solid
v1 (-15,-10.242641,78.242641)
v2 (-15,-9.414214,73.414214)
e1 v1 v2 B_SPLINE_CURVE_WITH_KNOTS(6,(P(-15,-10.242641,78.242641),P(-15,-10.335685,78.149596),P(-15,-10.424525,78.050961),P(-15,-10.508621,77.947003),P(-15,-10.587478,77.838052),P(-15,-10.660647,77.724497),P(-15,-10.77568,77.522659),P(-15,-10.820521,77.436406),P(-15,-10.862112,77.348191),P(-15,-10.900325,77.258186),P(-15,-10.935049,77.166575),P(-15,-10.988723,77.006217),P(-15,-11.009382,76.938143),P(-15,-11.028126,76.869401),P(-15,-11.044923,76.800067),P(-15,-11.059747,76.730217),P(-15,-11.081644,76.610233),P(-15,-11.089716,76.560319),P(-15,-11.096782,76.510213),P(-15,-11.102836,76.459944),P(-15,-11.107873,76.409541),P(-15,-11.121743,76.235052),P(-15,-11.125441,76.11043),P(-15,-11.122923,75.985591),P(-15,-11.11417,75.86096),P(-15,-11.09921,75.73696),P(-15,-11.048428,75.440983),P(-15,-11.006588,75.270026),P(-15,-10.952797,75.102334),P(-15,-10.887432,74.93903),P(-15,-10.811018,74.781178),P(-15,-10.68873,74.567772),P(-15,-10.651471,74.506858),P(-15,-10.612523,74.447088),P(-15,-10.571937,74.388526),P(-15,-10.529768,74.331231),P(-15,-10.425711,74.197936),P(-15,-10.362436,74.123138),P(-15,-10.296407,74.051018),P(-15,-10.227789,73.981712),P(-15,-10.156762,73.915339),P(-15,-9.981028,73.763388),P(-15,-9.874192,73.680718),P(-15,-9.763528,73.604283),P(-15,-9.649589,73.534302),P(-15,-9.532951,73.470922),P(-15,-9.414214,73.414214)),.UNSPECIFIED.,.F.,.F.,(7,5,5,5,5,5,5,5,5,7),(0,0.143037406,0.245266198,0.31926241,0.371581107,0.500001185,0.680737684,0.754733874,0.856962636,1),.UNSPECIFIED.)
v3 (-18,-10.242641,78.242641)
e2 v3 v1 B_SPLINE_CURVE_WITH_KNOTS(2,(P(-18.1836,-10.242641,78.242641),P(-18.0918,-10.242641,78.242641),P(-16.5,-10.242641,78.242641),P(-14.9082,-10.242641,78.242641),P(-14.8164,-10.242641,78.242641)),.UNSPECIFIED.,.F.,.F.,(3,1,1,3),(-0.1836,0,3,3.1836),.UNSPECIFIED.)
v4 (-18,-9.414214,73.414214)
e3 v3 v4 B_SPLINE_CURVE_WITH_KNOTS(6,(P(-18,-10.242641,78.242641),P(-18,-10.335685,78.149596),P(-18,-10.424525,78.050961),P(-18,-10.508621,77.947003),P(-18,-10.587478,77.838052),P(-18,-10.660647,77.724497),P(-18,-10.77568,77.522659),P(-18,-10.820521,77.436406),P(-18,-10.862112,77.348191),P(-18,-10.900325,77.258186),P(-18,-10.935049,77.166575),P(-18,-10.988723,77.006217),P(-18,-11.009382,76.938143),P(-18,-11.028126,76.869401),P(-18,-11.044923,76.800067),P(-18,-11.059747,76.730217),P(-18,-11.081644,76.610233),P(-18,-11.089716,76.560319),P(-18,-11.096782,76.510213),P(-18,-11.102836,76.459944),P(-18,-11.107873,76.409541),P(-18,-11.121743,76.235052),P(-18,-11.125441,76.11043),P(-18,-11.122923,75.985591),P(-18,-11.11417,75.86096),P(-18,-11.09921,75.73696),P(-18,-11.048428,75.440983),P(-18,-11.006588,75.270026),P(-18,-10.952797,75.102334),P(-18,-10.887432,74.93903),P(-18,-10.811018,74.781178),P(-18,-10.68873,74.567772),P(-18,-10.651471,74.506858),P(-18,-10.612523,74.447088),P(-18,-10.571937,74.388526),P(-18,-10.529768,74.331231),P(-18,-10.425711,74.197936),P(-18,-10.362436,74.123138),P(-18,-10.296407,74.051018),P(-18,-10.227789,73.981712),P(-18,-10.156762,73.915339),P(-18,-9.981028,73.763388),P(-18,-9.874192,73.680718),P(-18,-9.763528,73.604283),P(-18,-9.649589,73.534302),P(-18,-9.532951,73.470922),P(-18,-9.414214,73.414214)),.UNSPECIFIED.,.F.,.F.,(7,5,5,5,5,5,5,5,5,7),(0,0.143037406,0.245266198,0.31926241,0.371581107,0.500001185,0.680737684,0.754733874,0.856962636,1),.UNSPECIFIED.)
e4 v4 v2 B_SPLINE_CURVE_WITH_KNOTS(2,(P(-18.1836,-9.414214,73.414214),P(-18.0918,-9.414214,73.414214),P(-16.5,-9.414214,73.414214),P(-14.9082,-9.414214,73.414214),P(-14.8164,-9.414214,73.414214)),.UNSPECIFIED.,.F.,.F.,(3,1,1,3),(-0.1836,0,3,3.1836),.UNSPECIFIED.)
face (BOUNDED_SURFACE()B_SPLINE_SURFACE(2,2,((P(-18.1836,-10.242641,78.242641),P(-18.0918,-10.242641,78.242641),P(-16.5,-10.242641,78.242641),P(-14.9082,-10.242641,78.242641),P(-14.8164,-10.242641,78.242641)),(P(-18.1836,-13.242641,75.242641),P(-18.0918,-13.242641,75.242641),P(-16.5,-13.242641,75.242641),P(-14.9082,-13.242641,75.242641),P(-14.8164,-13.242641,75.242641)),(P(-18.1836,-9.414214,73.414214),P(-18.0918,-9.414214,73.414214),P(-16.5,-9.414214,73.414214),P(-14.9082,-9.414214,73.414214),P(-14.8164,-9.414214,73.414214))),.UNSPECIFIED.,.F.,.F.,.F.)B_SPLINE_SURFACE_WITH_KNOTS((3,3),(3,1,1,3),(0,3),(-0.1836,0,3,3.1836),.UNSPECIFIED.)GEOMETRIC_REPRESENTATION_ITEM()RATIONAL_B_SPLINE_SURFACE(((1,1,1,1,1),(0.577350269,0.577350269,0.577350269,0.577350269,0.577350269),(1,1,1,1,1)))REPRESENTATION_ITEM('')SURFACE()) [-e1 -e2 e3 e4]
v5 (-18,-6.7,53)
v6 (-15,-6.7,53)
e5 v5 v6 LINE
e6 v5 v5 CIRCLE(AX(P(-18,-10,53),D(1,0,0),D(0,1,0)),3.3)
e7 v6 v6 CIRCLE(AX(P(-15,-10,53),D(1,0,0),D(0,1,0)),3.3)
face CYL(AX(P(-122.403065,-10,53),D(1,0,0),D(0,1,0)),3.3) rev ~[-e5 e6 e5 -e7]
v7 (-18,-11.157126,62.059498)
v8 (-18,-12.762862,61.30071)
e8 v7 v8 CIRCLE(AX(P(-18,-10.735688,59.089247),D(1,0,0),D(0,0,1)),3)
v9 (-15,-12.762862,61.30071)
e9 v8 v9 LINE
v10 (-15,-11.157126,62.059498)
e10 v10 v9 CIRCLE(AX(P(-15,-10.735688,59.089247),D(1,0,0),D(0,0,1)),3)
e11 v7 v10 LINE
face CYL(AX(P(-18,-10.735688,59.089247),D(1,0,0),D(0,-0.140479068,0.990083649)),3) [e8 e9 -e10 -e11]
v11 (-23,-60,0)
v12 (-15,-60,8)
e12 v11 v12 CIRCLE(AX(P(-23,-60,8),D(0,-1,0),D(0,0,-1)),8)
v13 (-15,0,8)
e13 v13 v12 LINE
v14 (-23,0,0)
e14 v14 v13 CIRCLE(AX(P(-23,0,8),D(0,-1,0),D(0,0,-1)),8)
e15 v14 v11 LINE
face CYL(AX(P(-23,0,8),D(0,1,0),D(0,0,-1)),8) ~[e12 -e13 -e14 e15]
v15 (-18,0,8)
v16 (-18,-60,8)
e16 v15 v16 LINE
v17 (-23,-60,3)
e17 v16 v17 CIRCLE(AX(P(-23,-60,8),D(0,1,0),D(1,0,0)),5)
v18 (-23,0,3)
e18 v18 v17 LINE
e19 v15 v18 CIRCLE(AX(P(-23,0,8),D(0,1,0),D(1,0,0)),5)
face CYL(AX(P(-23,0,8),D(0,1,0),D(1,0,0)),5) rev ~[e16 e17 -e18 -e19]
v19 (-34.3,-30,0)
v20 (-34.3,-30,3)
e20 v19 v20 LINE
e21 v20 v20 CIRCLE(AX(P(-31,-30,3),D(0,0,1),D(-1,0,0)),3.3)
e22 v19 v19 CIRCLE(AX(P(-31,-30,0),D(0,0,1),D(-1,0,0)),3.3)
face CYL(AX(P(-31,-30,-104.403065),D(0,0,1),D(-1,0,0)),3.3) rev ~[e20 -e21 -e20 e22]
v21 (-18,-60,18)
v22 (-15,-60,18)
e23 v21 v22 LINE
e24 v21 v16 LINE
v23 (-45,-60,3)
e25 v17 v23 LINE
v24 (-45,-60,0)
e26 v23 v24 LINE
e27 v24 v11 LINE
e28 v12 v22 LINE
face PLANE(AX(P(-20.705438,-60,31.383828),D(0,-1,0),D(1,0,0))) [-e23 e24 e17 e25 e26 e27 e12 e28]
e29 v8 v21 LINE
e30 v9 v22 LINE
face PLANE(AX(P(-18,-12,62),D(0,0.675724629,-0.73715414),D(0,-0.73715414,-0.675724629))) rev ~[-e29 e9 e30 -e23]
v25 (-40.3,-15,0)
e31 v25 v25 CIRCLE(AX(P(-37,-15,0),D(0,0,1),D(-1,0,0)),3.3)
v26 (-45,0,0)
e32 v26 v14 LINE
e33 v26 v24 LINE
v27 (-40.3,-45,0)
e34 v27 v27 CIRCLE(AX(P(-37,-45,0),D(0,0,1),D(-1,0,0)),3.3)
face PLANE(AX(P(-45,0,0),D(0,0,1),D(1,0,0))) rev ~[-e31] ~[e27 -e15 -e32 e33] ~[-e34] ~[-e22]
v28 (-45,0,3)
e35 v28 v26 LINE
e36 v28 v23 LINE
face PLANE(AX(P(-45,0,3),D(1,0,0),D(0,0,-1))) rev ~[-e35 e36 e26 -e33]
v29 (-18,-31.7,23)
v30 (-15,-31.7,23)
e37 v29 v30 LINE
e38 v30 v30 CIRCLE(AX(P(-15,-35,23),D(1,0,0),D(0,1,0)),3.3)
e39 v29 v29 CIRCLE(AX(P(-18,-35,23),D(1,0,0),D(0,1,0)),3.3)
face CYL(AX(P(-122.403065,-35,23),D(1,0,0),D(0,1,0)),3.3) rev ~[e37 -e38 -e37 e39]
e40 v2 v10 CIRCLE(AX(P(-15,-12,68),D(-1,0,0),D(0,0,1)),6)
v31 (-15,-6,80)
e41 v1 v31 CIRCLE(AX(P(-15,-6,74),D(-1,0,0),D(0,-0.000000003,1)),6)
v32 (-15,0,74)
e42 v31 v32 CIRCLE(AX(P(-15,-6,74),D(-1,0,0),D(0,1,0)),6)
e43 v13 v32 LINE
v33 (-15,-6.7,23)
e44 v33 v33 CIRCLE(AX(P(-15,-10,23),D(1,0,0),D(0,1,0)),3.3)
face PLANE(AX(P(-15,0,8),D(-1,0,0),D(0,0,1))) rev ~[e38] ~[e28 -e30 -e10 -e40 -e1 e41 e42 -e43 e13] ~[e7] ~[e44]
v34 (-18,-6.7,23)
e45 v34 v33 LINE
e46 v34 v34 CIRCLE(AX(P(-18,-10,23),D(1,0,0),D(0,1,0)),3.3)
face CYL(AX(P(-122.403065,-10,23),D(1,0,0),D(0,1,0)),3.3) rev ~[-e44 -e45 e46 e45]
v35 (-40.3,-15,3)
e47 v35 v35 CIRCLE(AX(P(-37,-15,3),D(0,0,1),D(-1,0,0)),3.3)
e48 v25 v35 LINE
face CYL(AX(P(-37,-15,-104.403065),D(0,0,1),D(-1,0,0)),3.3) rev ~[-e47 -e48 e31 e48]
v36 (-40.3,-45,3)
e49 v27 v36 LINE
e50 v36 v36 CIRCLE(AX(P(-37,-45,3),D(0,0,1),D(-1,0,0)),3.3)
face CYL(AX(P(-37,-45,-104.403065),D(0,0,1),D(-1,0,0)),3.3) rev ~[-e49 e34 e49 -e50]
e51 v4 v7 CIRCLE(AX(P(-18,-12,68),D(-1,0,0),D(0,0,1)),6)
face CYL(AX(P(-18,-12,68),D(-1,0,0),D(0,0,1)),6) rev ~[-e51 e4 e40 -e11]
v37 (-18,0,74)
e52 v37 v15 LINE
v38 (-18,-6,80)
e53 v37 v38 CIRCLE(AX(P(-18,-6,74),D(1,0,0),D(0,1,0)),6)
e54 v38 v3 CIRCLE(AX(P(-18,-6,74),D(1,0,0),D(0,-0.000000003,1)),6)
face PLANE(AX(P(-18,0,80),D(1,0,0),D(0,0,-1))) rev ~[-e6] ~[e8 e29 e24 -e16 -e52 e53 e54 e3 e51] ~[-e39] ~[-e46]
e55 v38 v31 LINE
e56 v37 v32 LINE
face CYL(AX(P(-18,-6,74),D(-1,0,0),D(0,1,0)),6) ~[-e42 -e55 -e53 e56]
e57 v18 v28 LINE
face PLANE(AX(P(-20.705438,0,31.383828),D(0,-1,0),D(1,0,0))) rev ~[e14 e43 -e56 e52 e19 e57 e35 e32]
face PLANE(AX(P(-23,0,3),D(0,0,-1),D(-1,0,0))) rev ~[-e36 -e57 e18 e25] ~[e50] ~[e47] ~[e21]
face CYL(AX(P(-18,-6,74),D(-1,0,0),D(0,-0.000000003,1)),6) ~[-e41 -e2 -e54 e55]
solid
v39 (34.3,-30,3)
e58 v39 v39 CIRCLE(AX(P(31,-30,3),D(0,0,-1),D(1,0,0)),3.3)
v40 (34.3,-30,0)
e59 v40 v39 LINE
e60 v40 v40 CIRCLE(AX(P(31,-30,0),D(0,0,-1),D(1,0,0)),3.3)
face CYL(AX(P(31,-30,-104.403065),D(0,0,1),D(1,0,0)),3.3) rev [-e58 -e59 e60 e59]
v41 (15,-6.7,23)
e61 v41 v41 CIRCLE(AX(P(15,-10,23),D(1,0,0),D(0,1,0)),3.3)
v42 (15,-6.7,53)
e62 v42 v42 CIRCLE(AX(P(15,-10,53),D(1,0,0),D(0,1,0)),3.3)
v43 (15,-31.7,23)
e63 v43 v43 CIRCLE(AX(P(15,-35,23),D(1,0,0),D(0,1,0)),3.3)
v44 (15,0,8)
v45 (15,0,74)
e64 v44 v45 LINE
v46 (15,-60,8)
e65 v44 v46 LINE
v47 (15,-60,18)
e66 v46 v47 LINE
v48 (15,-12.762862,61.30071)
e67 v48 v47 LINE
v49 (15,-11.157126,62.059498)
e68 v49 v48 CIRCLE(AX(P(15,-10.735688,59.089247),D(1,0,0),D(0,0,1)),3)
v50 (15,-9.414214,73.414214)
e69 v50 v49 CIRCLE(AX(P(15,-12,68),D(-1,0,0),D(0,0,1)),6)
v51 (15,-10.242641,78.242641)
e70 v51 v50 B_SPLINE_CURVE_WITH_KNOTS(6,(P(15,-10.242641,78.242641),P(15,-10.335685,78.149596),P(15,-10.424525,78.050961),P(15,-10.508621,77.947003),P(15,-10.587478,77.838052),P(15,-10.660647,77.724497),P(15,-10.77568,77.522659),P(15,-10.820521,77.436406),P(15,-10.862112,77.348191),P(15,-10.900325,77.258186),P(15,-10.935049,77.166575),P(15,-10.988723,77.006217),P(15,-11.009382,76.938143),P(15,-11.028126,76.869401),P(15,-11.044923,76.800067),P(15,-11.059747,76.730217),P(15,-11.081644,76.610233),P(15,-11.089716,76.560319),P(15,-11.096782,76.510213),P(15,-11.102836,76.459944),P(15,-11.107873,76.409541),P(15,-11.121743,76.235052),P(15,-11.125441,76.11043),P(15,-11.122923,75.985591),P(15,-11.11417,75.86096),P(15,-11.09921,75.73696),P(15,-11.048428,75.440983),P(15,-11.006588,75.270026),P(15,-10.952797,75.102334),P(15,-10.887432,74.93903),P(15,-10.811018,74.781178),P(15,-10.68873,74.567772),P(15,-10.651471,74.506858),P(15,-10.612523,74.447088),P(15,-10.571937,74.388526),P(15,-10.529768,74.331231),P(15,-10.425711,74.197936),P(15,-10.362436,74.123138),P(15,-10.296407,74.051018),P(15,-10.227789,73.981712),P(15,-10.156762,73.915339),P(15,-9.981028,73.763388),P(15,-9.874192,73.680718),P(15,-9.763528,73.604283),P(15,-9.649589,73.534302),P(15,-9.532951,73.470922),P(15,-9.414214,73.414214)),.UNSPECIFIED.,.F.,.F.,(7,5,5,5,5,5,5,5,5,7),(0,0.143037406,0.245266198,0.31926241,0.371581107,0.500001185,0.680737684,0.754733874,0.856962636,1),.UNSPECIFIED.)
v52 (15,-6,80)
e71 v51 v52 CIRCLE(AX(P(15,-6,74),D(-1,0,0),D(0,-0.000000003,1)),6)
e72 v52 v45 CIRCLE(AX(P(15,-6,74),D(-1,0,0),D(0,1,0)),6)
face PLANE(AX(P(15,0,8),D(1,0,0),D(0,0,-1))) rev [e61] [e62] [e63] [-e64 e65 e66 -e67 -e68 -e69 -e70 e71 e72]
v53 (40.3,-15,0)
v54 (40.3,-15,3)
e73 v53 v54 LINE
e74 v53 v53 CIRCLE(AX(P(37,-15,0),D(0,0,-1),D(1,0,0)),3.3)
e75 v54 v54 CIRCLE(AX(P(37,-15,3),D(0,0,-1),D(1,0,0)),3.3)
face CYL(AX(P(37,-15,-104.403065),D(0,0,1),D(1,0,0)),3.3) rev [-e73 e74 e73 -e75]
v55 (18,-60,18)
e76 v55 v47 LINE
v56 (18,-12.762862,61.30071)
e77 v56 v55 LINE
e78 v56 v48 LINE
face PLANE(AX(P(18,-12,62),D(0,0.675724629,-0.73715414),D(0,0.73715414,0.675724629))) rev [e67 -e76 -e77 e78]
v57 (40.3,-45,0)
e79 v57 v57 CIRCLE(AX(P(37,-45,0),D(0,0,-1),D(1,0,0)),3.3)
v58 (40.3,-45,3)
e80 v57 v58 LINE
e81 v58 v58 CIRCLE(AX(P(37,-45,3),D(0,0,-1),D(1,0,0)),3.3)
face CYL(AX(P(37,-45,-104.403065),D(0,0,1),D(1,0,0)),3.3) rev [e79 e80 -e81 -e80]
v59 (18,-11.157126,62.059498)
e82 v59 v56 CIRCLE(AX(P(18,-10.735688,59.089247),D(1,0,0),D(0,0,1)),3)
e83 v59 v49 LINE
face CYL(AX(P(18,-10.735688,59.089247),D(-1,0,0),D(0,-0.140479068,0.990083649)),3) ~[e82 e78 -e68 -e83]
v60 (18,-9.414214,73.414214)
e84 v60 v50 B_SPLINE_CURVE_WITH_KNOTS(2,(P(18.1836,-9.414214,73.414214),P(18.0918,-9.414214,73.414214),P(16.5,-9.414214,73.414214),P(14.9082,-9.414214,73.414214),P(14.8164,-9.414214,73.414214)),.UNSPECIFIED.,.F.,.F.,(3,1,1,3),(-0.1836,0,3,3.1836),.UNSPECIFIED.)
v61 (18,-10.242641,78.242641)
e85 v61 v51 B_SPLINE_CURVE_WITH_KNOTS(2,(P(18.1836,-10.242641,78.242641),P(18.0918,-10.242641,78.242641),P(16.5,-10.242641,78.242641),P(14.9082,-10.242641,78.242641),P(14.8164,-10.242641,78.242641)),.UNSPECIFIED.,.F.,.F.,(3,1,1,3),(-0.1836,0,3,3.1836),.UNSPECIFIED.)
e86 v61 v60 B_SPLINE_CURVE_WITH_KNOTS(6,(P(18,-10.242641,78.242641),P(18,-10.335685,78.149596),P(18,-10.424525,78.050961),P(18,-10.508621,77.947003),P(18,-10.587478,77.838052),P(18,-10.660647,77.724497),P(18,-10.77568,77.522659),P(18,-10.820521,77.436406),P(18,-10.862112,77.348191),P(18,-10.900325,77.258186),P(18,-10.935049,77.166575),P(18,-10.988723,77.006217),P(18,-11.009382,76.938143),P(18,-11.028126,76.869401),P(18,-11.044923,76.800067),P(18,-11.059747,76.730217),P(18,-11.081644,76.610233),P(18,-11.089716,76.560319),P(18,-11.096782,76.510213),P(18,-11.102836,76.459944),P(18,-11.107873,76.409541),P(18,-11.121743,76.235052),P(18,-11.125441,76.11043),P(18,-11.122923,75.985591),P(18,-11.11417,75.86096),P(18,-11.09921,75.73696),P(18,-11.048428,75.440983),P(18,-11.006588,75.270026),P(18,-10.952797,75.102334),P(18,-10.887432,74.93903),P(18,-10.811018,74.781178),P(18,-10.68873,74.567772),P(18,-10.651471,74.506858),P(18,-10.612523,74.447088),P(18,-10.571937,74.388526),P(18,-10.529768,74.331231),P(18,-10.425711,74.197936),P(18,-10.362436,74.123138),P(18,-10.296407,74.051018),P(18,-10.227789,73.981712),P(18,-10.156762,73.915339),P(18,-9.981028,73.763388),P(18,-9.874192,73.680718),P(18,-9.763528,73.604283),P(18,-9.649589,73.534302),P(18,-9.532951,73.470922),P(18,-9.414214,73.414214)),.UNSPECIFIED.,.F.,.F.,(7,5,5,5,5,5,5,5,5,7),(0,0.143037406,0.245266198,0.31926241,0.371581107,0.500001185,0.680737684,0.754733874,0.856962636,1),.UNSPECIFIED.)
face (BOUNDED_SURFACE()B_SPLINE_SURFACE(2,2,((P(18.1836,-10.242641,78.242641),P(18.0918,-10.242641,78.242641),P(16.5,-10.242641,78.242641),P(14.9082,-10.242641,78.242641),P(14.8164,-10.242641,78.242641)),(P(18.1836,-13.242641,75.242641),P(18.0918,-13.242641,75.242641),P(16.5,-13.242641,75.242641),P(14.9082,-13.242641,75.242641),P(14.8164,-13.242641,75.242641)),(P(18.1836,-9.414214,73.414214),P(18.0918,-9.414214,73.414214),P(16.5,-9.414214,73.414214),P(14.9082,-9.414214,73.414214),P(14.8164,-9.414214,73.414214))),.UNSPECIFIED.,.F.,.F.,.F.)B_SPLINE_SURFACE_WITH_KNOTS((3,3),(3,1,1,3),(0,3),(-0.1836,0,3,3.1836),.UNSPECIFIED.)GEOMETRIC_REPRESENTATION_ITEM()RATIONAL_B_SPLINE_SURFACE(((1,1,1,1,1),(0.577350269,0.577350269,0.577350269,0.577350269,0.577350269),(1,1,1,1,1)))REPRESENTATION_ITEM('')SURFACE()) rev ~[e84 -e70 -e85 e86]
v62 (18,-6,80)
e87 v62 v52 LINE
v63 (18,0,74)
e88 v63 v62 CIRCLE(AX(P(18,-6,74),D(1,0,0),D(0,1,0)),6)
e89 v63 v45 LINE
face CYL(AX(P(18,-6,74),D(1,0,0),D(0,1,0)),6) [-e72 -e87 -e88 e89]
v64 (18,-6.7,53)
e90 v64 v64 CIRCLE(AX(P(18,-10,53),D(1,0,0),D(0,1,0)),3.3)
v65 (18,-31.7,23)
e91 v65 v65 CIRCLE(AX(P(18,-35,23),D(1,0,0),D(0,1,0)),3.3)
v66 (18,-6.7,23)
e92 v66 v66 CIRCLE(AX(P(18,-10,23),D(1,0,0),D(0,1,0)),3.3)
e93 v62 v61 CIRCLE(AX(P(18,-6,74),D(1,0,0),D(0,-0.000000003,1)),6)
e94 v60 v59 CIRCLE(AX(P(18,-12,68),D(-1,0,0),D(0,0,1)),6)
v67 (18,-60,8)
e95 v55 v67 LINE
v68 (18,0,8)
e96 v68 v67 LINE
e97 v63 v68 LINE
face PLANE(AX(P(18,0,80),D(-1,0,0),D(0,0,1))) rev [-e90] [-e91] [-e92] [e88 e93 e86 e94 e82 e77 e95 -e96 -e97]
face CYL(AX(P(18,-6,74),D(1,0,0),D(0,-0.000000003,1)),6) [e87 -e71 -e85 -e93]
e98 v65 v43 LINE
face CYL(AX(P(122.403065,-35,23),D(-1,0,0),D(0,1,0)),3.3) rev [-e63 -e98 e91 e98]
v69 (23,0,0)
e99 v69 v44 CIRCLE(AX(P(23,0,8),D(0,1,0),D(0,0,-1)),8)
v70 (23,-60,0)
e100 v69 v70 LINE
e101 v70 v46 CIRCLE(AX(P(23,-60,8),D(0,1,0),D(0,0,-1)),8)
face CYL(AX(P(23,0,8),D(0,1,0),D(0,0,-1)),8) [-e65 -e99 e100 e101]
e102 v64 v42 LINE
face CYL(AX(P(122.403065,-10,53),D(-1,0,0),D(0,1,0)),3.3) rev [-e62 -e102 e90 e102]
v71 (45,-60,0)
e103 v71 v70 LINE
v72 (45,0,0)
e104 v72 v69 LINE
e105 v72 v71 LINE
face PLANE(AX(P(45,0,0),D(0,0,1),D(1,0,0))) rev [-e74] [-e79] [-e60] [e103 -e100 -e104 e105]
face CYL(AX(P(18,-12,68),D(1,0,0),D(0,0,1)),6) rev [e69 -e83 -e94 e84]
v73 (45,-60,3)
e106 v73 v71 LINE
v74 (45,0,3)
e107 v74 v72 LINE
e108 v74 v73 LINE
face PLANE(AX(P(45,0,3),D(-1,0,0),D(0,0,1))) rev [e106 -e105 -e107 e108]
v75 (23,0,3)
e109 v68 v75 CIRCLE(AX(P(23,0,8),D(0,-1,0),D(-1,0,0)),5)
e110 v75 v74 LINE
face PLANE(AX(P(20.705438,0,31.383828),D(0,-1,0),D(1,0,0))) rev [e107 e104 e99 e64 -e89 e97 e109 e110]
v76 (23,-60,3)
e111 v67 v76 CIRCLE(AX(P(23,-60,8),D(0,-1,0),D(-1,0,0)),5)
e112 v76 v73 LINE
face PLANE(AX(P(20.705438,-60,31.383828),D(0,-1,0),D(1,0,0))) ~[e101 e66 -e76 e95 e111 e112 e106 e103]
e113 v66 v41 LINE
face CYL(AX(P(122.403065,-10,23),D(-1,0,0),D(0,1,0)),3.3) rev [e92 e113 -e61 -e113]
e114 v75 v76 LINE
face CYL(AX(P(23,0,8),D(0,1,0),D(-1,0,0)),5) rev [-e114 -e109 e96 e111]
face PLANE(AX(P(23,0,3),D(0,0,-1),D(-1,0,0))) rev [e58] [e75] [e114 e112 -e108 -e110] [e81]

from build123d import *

# Parameters (mm, degrees)
F1_DEPTH = 60
F3_DEPTH = 25
F4_R     = 3
F6_D     = 6.6
F8_D     = 6.6


# Not quite as in the source:
# - a feature names something its author has since deleted; it is built from what else it names


with BuildPart() as f1:
    # F0 (on Front) → F1 (new body)
    with BuildSketch(Plane.XZ):
        with BuildLine():
            ThreePointArc((-23, 0), (-17.3431457505, 2.3431457505), (-15, 8))
            Line((-15, 8), (-15, 80))
            Line((-15, 80), (-18, 80))
            Line((-18, 80), (-18, 8))
            ThreePointArc((-18, 8), (-19.4644660941, 4.4644660941), (-23, 3))
            Line((-23, 3), (-45, 3))
            Line((-45, 3), (-45, 0))
            Line((-45, 0), (-23, 0))
        make_face()
    extrude(amount=F1_DEPTH)

    # F2 (on face) → F3 (cut)
    with BuildSketch(Plane(origin=(-18, 0, 0), x_dir=(0, -1, 0), z_dir=(-1, 0, 0))):
        with BuildLine():
            Line((60, 18), (60, 80))
            Line((60, 80), (6.0000000167, 80))
            ThreePointArc((6.0000000167, 80), (10.242640693, 78.2426406812), (12, 74))
            ThreePointArc((12, 74), (6, 68), (12, 62))
            Line((12, 62), (60, 18))
        make_face()
        with BuildLine():
            ThreePointArc((0, 74), (1.7573593188, 78.242640693), (6.0000000167, 80))
            Line((6.0000000167, 80), (0, 80))
            Line((0, 80), (0, 74))
        make_face()
    extrude(amount=-F3_DEPTH, mode=Mode.SUBTRACT)

    # F4
    f4_edges = [f1.edges().sort_by_distance(p)[0] for p in [
        (-16.5, -12, 74),
        (-16.5, -12, 62),
    ]]
    fillet(f4_edges, radius=F4_R)

    # F6 (through all)
    with Locations(Plane(origin=(0, 0, 0), x_dir=(1, 0, 0), z_dir=(0, 0, -1))):
        with Locations((-37, 15), (-31, 30), (-37, 45)):
            Hole(F6_D / 2)

    # F8 (through all)
    with Locations(Plane(origin=(-18, 0, 0), x_dir=(0, -1, 0), z_dir=(-1, 0, 0))):
        with Locations((10, 53), (10, 23), (35, 23)):
            Hole(F8_D / 2)


with BuildPart() as f9_1:
    # F9: instance of F1
    add(f1.part.mirror(Plane.YZ))


solid = Compound([f1.part, f9_1.part])
